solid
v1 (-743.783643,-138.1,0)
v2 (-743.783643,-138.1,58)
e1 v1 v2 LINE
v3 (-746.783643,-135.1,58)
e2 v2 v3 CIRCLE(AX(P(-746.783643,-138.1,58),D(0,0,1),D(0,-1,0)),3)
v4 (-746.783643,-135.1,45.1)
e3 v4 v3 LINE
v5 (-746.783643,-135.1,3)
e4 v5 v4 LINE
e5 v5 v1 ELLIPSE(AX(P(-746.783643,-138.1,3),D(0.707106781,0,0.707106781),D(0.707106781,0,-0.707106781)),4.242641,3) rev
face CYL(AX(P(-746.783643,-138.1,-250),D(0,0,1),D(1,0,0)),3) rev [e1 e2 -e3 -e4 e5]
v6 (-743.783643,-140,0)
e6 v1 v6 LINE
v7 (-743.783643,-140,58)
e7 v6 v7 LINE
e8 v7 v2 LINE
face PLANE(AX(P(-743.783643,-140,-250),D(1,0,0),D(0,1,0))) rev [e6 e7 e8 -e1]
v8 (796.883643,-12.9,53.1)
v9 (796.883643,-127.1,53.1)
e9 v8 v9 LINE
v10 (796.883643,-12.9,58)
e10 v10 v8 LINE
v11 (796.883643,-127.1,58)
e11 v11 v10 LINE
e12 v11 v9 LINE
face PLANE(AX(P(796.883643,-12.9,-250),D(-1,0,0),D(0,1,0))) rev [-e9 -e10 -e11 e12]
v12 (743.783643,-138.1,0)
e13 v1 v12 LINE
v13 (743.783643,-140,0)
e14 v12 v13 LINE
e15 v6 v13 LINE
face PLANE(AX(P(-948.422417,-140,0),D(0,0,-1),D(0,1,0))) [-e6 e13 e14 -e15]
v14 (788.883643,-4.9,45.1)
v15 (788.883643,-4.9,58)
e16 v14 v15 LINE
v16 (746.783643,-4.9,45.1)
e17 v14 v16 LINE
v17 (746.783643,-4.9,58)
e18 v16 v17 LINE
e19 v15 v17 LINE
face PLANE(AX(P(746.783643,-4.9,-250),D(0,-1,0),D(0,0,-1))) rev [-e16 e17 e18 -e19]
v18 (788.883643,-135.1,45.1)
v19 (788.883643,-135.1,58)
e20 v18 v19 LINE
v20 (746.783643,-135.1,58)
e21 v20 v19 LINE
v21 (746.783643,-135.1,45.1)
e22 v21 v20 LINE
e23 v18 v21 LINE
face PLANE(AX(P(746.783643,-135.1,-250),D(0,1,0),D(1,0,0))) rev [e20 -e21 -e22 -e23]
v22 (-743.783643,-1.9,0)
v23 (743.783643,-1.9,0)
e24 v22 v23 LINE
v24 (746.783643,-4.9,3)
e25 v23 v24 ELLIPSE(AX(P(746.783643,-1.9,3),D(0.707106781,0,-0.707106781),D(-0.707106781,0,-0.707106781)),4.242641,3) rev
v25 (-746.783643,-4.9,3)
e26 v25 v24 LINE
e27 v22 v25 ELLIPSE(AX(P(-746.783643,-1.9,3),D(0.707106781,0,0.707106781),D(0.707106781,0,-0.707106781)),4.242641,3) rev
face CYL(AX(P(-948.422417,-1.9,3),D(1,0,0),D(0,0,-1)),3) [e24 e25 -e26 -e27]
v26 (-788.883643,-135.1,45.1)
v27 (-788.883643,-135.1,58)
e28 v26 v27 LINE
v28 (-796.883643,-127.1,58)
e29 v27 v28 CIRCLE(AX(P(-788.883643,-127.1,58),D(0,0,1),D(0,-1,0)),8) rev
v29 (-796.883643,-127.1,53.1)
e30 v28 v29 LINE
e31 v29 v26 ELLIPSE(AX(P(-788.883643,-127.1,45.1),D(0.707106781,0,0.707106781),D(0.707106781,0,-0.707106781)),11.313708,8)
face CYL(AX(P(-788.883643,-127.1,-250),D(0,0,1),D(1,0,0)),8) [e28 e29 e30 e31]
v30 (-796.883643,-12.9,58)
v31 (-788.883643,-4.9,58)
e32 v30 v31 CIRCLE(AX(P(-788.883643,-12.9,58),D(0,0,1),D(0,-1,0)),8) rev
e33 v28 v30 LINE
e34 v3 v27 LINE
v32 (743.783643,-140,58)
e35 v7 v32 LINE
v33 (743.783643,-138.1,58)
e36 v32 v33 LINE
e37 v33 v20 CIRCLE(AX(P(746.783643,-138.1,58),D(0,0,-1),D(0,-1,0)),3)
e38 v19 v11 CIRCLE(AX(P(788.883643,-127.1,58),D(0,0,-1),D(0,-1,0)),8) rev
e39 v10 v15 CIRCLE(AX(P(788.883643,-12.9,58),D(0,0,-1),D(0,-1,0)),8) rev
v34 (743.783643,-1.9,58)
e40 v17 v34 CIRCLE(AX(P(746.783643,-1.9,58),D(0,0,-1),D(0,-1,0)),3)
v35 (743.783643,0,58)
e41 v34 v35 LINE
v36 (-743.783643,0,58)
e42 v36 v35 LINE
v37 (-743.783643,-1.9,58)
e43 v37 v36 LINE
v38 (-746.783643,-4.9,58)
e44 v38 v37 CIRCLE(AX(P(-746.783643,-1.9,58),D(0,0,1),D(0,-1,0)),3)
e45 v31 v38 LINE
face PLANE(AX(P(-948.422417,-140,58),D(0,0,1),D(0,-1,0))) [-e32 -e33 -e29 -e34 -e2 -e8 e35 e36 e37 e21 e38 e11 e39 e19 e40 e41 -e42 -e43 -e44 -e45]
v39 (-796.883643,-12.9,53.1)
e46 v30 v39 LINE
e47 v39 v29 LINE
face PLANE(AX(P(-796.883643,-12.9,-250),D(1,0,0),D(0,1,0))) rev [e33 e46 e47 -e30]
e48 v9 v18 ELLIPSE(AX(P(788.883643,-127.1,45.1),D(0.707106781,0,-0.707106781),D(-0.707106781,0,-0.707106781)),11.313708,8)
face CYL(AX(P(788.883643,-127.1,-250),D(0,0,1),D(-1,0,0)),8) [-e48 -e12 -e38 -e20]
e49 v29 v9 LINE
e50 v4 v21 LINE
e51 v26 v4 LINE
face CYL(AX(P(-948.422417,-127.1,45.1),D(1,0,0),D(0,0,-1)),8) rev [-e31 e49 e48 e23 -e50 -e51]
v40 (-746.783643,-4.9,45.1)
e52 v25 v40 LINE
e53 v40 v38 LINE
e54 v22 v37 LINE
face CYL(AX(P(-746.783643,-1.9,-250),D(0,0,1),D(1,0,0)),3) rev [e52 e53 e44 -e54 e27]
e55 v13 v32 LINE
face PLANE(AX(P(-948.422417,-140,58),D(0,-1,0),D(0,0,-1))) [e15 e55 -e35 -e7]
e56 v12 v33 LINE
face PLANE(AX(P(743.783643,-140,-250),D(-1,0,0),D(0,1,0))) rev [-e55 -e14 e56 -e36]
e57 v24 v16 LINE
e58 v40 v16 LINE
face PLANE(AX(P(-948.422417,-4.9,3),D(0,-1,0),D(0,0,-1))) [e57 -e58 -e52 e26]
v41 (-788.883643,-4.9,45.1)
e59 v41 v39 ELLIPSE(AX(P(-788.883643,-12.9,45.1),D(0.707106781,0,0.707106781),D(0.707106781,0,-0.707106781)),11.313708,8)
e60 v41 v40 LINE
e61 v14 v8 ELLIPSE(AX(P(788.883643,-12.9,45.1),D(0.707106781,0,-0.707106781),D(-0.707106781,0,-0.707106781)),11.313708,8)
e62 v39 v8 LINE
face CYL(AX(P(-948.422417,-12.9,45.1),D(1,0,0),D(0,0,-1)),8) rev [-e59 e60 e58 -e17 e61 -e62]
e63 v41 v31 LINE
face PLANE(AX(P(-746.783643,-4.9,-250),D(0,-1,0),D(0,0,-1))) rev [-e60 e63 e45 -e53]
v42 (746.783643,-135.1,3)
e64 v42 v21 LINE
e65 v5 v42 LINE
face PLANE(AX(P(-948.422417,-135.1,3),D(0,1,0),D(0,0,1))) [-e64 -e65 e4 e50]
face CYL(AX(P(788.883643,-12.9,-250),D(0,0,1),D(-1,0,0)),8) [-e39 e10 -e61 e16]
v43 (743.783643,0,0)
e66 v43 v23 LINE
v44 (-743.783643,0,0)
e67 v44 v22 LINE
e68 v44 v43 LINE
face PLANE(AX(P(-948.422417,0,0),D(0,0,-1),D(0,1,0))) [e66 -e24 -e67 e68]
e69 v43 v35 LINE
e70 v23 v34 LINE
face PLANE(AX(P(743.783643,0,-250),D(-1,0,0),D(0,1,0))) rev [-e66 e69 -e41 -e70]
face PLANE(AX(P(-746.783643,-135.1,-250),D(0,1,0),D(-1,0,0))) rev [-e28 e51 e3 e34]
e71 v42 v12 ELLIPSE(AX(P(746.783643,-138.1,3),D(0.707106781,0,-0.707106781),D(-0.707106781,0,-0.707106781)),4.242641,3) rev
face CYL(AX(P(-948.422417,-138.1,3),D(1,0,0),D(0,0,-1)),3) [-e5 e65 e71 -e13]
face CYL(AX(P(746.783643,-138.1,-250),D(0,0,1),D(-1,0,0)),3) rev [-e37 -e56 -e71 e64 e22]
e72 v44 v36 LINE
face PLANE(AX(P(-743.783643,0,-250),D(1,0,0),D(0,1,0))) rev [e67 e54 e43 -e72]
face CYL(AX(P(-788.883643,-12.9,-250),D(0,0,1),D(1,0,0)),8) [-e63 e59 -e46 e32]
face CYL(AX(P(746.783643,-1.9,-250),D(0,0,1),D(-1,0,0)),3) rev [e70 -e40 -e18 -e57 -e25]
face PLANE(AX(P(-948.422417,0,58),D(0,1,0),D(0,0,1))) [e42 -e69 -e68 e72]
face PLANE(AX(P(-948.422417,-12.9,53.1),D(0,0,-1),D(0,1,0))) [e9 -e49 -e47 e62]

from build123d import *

# Parameters (mm, degrees)
EXTRUDE_1_DEPTH = 796.883643365
OTHER_1_DEPTH   = 58


# Read off the part's stored shape, not the designer's step: Полость1
with BuildPart() as part:
    # Эскиз2 → Бобышка-Вытянуть1 (new body)
    with BuildSketch(Plane(origin=(0, 0, 0), x_dir=(0, 0, -1), z_dir=(1, 0, 0))):
        with BuildLine():
            Line((-58, -140), (-58, 0))
            Line((-58, 0), (0, 0))
            Line((0, 0), (0, -1.9))
            ThreePointArc((0, -1.9), (-0.878679656, -4.021320344), (-3, -4.9))
            Line((-3, -4.9), (-45.1, -4.9))
            ThreePointArc((-45.1, -4.9), (-50.756854249, -7.243145751), (-53.1, -12.9))
            Line((-53.1, -12.9), (-53.1, -127.1))
            ThreePointArc((-53.1, -127.1), (-50.756854249, -132.756854249), (-45.1, -135.1))
            Line((-45.1, -135.1), (-3, -135.1))
            ThreePointArc((-3, -135.1), (-0.878679656, -135.978679656), (0, -138.1))
            Line((0, -138.1), (0, -140))
            Line((0, -140), (-58, -140))
        make_face()
    extrude(amount=-EXTRUDE_1_DEPTH)

    # Полость1 outline → Полость1 (cut)
    with BuildSketch(Plane.XY):
        with BuildLine():
            Line((-796.883643365, -140), (-743.783643365, -140))
            Line((-743.783643365, -140), (-743.783643365, -138.1))
            ThreePointArc((-743.783643365, -138.1), (-744.662323022, -135.978679656), (-746.783643365, -135.1))
            Line((-746.783643365, -135.1), (-788.883643365, -135.1))
            ThreePointArc((-788.883643365, -135.1), (-794.540497615, -132.75685425), (-796.883643365, -127.1))
            Line((-796.883643365, -127.1), (-796.883643365, -140))
        make_face()
        with BuildLine():
            ThreePointArc((-796.883643365, -12.9), (-794.540497615, -7.24314575), (-788.883643365, -4.9))
            Line((-788.883643365, -4.9), (-746.783643365, -4.9))
            ThreePointArc((-746.783643365, -4.9), (-744.662323022, -4.021320343), (-743.783643365, -1.9))
            Line((-743.783643365, -1.9), (-743.783643365, 0))
            Line((-743.783643365, 0), (-796.883643365, 0))
            Line((-796.883643365, 0), (-796.883643365, -12.9))
        make_face()
    extrude(amount=OTHER_1_DEPTH, mode=Mode.SUBTRACT)

    # Зеркальное отражение1: part across plane


with BuildPart() as part_1:
    add(part.part)
    add(part.part.mirror(Plane(origin=(0, -1.9, 3), x_dir=(0, 0, 1), z_dir=(-1, 0, 0))))


solid = part_1.part
